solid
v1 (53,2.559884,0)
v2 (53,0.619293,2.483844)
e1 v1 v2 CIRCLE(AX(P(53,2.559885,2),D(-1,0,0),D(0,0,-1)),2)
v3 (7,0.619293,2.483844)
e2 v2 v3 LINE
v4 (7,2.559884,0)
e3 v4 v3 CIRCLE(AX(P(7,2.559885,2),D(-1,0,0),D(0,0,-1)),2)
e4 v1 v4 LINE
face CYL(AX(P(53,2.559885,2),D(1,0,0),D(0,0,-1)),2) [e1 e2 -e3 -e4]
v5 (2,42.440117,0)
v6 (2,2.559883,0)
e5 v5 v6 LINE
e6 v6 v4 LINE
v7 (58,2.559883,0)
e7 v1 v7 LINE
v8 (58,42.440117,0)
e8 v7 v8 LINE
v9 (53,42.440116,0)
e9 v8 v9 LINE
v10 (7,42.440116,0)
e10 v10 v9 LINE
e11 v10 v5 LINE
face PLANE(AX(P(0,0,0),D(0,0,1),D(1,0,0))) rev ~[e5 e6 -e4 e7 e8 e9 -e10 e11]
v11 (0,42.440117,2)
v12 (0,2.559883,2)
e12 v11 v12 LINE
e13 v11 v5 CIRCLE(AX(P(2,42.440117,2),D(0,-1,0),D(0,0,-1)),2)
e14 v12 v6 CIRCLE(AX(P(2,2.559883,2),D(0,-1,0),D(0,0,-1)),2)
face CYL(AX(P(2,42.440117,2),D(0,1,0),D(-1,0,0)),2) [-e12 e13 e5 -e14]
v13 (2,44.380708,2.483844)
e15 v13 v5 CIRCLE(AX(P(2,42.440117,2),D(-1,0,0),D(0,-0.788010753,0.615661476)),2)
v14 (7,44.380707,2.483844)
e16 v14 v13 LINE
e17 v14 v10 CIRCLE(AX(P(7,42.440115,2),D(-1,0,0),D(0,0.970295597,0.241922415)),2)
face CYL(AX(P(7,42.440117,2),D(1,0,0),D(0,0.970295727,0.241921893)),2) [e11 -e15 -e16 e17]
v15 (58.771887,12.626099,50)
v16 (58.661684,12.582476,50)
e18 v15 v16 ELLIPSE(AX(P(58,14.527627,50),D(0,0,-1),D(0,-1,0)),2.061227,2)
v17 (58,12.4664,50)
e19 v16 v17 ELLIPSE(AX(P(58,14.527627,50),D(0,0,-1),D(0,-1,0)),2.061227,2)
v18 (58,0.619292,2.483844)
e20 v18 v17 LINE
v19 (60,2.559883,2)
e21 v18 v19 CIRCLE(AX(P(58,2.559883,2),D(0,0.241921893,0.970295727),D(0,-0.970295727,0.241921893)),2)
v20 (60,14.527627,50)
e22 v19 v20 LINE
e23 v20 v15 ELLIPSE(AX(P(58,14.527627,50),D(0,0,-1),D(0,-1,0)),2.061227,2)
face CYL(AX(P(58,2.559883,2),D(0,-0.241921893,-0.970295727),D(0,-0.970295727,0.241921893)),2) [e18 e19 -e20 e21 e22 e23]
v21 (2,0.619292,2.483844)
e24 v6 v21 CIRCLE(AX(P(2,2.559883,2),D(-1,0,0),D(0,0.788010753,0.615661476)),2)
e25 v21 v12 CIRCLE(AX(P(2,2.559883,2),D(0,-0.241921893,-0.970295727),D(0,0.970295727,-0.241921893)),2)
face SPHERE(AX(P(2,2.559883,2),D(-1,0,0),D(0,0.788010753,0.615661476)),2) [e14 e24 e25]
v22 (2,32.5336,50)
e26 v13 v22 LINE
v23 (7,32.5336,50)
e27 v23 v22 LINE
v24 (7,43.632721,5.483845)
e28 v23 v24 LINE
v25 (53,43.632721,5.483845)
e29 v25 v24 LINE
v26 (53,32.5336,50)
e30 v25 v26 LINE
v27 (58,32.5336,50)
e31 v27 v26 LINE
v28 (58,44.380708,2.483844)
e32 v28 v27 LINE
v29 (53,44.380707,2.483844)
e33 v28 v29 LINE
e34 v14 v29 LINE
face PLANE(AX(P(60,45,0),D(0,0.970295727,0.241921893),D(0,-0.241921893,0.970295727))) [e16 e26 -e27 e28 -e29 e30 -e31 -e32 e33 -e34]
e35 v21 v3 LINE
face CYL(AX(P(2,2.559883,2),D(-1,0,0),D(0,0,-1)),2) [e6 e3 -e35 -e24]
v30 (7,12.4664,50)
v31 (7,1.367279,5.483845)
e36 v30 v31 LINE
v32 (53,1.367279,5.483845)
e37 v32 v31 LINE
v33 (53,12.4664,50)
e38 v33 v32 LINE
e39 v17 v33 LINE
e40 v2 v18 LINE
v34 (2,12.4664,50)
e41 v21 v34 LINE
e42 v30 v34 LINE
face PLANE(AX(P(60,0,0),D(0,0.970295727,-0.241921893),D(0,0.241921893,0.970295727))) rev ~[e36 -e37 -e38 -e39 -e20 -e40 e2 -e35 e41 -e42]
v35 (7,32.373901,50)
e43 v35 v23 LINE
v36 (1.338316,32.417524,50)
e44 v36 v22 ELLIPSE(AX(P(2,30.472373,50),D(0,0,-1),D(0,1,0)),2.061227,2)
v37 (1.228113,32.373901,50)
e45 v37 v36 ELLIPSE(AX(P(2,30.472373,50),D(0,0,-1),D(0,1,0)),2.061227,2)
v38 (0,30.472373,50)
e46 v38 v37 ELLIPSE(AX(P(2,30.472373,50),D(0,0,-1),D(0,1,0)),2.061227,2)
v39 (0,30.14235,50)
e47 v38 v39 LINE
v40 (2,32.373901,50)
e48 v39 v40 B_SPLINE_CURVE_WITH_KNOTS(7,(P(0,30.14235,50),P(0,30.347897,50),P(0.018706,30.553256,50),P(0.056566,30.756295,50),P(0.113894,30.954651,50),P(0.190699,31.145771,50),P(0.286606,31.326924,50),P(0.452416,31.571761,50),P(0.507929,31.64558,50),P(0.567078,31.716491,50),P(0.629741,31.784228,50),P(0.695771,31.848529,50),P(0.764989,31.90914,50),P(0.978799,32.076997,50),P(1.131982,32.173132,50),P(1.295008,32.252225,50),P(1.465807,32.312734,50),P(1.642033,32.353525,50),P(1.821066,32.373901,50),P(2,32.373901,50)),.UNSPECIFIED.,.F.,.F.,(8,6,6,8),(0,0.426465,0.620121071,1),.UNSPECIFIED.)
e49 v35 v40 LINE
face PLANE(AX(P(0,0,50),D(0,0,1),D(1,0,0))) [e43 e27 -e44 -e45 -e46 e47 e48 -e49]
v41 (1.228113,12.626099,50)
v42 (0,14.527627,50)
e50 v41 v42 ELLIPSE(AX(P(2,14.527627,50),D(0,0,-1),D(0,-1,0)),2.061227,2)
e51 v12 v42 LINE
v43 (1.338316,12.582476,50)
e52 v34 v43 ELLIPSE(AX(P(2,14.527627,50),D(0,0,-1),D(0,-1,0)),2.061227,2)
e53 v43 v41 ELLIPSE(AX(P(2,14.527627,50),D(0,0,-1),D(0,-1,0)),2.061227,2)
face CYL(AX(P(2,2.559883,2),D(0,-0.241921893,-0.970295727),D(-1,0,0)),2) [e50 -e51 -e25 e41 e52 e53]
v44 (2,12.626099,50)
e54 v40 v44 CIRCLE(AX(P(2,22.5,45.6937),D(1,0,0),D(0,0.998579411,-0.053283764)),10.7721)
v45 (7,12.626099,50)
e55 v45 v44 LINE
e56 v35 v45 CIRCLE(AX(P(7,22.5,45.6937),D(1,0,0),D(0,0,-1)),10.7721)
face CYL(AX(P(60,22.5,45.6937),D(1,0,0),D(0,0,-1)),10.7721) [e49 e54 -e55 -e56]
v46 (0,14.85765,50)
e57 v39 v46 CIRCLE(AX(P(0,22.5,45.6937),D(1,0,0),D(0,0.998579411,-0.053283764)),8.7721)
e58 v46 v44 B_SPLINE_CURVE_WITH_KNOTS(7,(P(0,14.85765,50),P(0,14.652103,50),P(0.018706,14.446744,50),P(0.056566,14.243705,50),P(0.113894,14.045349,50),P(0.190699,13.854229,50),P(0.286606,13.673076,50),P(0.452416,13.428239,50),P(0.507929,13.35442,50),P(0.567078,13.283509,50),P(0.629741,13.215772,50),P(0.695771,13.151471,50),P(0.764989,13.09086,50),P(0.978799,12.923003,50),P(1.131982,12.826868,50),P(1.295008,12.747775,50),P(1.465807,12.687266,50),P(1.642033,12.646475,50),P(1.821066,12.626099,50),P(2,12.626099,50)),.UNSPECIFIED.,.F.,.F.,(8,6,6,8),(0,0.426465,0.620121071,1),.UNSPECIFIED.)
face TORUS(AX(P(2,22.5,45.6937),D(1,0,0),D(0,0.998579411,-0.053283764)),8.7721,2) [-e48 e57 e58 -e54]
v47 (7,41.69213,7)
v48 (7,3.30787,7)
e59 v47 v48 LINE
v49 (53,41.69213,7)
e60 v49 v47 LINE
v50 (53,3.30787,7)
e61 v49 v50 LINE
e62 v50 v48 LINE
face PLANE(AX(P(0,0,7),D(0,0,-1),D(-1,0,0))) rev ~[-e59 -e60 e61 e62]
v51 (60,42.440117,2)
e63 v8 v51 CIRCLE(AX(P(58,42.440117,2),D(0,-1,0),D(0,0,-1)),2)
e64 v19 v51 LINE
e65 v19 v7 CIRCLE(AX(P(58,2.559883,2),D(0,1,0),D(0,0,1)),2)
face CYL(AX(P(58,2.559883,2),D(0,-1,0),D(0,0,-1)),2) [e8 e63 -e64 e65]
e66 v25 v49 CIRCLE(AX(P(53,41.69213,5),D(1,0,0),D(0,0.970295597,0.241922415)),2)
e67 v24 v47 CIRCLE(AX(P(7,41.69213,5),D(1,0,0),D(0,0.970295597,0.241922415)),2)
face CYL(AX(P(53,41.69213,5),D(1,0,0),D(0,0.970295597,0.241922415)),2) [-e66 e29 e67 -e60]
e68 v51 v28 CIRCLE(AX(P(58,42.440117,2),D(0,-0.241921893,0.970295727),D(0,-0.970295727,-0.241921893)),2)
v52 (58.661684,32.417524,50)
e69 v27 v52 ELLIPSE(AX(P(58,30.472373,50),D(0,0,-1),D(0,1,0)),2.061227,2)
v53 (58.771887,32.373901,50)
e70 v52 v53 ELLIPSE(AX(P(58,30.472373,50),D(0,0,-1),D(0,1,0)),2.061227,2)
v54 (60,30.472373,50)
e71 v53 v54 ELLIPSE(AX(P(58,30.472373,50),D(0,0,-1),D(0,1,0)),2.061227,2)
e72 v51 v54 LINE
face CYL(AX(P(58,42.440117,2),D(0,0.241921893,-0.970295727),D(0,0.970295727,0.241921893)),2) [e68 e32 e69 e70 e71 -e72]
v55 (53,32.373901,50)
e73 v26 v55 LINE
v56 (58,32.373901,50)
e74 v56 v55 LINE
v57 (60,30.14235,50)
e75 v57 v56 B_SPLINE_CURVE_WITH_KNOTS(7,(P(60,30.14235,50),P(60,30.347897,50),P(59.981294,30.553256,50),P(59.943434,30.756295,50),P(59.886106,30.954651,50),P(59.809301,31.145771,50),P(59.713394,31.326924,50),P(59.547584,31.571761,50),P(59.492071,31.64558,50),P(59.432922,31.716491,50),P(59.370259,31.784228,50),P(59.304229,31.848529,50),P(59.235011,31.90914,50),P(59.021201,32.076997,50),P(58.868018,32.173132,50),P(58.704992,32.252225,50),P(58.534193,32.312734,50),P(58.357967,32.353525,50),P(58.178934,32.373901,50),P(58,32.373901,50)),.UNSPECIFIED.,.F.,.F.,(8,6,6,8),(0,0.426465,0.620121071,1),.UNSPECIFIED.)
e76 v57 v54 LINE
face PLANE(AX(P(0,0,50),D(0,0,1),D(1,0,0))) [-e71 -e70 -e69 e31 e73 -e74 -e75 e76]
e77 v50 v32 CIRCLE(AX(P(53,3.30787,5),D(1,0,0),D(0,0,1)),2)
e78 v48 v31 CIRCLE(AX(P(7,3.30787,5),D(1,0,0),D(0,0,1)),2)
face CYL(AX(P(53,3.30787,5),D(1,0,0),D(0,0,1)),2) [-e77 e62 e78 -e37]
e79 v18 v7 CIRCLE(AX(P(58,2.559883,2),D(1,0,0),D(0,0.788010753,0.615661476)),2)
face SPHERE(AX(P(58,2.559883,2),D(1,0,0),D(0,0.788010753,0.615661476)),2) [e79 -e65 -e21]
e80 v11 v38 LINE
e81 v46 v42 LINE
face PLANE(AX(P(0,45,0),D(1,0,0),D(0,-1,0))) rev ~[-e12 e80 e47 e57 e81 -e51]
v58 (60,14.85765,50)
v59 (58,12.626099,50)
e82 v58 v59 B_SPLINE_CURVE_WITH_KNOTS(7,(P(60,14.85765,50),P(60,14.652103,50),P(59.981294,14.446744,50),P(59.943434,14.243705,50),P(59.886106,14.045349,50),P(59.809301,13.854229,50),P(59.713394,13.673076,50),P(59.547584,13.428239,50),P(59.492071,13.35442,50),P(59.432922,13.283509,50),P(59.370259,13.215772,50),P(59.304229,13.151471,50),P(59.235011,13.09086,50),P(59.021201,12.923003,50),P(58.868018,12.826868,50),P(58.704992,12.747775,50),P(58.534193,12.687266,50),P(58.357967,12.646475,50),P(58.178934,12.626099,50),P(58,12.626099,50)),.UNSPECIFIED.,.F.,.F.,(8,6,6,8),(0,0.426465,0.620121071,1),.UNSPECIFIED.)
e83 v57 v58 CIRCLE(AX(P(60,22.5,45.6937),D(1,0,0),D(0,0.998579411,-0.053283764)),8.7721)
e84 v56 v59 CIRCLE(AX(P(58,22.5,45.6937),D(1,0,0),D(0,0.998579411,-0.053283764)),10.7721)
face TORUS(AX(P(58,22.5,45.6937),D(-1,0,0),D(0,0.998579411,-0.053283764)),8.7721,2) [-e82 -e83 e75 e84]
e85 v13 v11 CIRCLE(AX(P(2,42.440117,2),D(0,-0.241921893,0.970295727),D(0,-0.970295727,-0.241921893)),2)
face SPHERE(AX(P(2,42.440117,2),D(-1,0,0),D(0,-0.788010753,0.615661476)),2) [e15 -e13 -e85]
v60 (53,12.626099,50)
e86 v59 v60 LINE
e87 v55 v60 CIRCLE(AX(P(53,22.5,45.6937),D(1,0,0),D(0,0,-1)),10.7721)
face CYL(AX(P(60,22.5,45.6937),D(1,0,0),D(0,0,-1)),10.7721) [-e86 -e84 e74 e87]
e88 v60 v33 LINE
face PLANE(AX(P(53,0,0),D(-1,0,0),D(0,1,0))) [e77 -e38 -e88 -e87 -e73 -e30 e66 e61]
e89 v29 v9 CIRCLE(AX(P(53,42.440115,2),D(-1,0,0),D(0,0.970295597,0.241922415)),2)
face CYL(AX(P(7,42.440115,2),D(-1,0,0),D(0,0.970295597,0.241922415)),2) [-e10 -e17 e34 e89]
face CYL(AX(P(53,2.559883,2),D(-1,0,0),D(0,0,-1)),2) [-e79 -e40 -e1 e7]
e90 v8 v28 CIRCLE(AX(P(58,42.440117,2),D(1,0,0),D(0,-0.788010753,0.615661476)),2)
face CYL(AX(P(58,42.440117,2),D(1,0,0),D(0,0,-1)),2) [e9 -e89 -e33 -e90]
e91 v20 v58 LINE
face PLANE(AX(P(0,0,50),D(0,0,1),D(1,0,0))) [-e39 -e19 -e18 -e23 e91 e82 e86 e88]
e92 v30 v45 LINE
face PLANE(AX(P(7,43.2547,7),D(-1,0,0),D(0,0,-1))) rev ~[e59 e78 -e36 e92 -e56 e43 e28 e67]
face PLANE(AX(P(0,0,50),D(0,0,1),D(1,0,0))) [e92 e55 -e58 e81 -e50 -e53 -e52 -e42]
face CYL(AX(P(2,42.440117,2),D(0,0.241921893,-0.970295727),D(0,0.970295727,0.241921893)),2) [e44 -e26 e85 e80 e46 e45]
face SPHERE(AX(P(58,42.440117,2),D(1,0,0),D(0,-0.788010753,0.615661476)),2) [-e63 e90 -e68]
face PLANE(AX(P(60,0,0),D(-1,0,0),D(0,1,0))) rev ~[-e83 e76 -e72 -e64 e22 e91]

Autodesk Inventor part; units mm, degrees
ref_plane "YZ Plane" through (0, 0, 0) normal (1, 0, 0) x (0, 1, 0)
ref_plane "XZ Plane" through (0, 0, 0) normal (0, 1, 0) x (-1, 0, 0)
ref_plane "XY Plane" through (0, 0, 0) normal (0, 0, 1) x (1, 0, 0)
sketch "Sketch1" plane through (0, 0, 0) normal (0, 0, 1) x (1, 0, 0)
  point P0 (0, 0)
sketch "Sketch2" plane through (0, 0, 0) normal (0, 0, 1) x (1, 0, 0)
  line L0 (0, 0) -> (60, 0)
  line L1 (60, 0) -> (60, 45)
  line L2 (60, 45) -> (0, 45)
  line L3 (0, 45) -> (0, 0)
  dimension "d0" = 60
  dimension "d1" = 45
extrude "Extrusion1" add sketch "Sketch2" along normal blind 50
sketch "Sketch3" plane through (60, 0, 0) normal (1, 0, 0) x (0, 0, -1)
  line L0 (0, 45) -> (-50, 45) projected
  line L1 (-50, 0) -> (-50, 45) projected
  line L2 (0, 0) -> (-50, 0) projected
  line L3 (0, 45) -> (-50, 32.5336)
  line L4 (0, 45) -> (51.5307, 45) construction
  line L5 (0, 0) -> (-50, 12.4664)
  line L6 (0, 0) -> (51.5307, 0) construction
  dimension "d4" = 166
  dimension "d5" = 166
extrude "Extrusion2" cut sketch "Sketch3" against normal through all
sketch "Sketch4" plane through (60, 0, 0) normal (1, 0, 0) x (0, 0, -1)
  line L0 (-50, 12.4664) -> (-50, 32.5336) projected
  circle A0 centre (-45.6937, 22.5) radius 10.7721
  point P0 (-50, 32.3739)
  point P1 (-50, 12.6261)
extrude "Extrusion3" add sketch "Sketch4" against normal blind 60 contours A0 L0 picked at (-52.7772, 22.9072)
sketch "Sketch6" plane through (0, 0, 0) normal (0, 0, -1) x (-1, 0, 0)
  line L0 (0, 0) -> (-60, 0) projected
  line L1 (-60, 45) -> (0, 45) projected
  line L2 (-7, 0) -> (-53, 0)
  line L3 (-53, 0) -> (-53, 45)
  line L4 (-53, 45) -> (-7, 45)
  line L5 (-7, 45) -> (-7, 0)
  point P0 (-7, 45)
  dimension "d10" = 46
extrude "Extrusion4" cut sketch "Sketch6" against normal through all
sketch "Sketch7" plane through (0, 0, 0) normal (0, 0, -1) x (-1, 0, 0)
  line L0 (-7, 45) -> (-7, 0) projected
  line L1 (-7, 32.5336) -> (-7, 45) projected
  line L2 (-53, 0) -> (-60, 0) projected
  line L3 (-7, 45) -> (-53, 45)
  line L4 (-53, 45) -> (-53, 0)
  line L5 (-53, 0) -> (-7, 0)
  line L6 (-7, 0) -> (-7, 45)
  point P0 (-7, 0)
extrude "Extrusion5" add sketch "Sketch7" against normal blind 7
sketch "Sketch8" plane through (60, 0, 0) normal (1, 0, 0) x (0, 0, -1)
  line L0 (0, 45) -> (-50, 32.5336) projected
  line L1 (-50, 32.3739) -> (-50, 32.5336) projected
  arc A0 (-50, 32.3739) -> (-50, 12.6261) centre (-45.6937, 22.5) ccw projected
  line L2 (-50, 12.4664) -> (-50, 12.6261) projected
  line L3 (-50, 12.4664) -> (0, 0) projected
  line L4 (0, 0) -> (0, 45) projected
sketch "Sketch9" plane through (53, 43.2547, 7) normal (1, 0, 0) x (0, 0, -1)
  line L0 (7, 1.7453) -> (0, 0) projected
  line L1 (7, 1.7453) -> (0, 1.7453) projected
  line L2 (0, 0) -> (0, 1.7453) projected
  line L3 (7, -43.2547) -> (7, 1.7453) projected
  line L4 (0, 0) -> (7, 1.7453)
  line L5 (7, 1.7453) -> (0, 1.7453)
extrude "Extrusion6" cut sketch "Sketch9" against normal through all
sketch "Sketch10" plane through (53, 0, 7) normal (1, 0, 0) x (0, 0, -1)
  line L0 (0, 1.7453) -> (7, 0) projected
  line L1 (0, 0) -> (0, 1.7453) projected
  line L2 (7, 0) -> (0, 0) projected
  line L3 (-43, 12.4664) -> (7, 0) projected
  line L4 (0, 43.2547) -> (0, 1.7453) projected
  line L5 (7, 0) -> (0, 1.7453)
  line L6 (0, 1.7453) -> (0, 0)
extrude "Extrusion7" cut sketch "Sketch10" against normal through all
fillet "Fillet1" radius 2 12 edges at (60, 6.2332, 25) (60, 22.5, 56.4658) (60, 38.7668, 25) (60, 22.5, 0) (30, 0, 0) (30, 45, 0) (0, 22.5, 0) (0, 6.2332, 25) (0, 22.5, 56.4658) (0, 38.7668, 25) (30, 43.2547, 7) (30, 1.7453, 7)
properties part number "schouder(s)"
